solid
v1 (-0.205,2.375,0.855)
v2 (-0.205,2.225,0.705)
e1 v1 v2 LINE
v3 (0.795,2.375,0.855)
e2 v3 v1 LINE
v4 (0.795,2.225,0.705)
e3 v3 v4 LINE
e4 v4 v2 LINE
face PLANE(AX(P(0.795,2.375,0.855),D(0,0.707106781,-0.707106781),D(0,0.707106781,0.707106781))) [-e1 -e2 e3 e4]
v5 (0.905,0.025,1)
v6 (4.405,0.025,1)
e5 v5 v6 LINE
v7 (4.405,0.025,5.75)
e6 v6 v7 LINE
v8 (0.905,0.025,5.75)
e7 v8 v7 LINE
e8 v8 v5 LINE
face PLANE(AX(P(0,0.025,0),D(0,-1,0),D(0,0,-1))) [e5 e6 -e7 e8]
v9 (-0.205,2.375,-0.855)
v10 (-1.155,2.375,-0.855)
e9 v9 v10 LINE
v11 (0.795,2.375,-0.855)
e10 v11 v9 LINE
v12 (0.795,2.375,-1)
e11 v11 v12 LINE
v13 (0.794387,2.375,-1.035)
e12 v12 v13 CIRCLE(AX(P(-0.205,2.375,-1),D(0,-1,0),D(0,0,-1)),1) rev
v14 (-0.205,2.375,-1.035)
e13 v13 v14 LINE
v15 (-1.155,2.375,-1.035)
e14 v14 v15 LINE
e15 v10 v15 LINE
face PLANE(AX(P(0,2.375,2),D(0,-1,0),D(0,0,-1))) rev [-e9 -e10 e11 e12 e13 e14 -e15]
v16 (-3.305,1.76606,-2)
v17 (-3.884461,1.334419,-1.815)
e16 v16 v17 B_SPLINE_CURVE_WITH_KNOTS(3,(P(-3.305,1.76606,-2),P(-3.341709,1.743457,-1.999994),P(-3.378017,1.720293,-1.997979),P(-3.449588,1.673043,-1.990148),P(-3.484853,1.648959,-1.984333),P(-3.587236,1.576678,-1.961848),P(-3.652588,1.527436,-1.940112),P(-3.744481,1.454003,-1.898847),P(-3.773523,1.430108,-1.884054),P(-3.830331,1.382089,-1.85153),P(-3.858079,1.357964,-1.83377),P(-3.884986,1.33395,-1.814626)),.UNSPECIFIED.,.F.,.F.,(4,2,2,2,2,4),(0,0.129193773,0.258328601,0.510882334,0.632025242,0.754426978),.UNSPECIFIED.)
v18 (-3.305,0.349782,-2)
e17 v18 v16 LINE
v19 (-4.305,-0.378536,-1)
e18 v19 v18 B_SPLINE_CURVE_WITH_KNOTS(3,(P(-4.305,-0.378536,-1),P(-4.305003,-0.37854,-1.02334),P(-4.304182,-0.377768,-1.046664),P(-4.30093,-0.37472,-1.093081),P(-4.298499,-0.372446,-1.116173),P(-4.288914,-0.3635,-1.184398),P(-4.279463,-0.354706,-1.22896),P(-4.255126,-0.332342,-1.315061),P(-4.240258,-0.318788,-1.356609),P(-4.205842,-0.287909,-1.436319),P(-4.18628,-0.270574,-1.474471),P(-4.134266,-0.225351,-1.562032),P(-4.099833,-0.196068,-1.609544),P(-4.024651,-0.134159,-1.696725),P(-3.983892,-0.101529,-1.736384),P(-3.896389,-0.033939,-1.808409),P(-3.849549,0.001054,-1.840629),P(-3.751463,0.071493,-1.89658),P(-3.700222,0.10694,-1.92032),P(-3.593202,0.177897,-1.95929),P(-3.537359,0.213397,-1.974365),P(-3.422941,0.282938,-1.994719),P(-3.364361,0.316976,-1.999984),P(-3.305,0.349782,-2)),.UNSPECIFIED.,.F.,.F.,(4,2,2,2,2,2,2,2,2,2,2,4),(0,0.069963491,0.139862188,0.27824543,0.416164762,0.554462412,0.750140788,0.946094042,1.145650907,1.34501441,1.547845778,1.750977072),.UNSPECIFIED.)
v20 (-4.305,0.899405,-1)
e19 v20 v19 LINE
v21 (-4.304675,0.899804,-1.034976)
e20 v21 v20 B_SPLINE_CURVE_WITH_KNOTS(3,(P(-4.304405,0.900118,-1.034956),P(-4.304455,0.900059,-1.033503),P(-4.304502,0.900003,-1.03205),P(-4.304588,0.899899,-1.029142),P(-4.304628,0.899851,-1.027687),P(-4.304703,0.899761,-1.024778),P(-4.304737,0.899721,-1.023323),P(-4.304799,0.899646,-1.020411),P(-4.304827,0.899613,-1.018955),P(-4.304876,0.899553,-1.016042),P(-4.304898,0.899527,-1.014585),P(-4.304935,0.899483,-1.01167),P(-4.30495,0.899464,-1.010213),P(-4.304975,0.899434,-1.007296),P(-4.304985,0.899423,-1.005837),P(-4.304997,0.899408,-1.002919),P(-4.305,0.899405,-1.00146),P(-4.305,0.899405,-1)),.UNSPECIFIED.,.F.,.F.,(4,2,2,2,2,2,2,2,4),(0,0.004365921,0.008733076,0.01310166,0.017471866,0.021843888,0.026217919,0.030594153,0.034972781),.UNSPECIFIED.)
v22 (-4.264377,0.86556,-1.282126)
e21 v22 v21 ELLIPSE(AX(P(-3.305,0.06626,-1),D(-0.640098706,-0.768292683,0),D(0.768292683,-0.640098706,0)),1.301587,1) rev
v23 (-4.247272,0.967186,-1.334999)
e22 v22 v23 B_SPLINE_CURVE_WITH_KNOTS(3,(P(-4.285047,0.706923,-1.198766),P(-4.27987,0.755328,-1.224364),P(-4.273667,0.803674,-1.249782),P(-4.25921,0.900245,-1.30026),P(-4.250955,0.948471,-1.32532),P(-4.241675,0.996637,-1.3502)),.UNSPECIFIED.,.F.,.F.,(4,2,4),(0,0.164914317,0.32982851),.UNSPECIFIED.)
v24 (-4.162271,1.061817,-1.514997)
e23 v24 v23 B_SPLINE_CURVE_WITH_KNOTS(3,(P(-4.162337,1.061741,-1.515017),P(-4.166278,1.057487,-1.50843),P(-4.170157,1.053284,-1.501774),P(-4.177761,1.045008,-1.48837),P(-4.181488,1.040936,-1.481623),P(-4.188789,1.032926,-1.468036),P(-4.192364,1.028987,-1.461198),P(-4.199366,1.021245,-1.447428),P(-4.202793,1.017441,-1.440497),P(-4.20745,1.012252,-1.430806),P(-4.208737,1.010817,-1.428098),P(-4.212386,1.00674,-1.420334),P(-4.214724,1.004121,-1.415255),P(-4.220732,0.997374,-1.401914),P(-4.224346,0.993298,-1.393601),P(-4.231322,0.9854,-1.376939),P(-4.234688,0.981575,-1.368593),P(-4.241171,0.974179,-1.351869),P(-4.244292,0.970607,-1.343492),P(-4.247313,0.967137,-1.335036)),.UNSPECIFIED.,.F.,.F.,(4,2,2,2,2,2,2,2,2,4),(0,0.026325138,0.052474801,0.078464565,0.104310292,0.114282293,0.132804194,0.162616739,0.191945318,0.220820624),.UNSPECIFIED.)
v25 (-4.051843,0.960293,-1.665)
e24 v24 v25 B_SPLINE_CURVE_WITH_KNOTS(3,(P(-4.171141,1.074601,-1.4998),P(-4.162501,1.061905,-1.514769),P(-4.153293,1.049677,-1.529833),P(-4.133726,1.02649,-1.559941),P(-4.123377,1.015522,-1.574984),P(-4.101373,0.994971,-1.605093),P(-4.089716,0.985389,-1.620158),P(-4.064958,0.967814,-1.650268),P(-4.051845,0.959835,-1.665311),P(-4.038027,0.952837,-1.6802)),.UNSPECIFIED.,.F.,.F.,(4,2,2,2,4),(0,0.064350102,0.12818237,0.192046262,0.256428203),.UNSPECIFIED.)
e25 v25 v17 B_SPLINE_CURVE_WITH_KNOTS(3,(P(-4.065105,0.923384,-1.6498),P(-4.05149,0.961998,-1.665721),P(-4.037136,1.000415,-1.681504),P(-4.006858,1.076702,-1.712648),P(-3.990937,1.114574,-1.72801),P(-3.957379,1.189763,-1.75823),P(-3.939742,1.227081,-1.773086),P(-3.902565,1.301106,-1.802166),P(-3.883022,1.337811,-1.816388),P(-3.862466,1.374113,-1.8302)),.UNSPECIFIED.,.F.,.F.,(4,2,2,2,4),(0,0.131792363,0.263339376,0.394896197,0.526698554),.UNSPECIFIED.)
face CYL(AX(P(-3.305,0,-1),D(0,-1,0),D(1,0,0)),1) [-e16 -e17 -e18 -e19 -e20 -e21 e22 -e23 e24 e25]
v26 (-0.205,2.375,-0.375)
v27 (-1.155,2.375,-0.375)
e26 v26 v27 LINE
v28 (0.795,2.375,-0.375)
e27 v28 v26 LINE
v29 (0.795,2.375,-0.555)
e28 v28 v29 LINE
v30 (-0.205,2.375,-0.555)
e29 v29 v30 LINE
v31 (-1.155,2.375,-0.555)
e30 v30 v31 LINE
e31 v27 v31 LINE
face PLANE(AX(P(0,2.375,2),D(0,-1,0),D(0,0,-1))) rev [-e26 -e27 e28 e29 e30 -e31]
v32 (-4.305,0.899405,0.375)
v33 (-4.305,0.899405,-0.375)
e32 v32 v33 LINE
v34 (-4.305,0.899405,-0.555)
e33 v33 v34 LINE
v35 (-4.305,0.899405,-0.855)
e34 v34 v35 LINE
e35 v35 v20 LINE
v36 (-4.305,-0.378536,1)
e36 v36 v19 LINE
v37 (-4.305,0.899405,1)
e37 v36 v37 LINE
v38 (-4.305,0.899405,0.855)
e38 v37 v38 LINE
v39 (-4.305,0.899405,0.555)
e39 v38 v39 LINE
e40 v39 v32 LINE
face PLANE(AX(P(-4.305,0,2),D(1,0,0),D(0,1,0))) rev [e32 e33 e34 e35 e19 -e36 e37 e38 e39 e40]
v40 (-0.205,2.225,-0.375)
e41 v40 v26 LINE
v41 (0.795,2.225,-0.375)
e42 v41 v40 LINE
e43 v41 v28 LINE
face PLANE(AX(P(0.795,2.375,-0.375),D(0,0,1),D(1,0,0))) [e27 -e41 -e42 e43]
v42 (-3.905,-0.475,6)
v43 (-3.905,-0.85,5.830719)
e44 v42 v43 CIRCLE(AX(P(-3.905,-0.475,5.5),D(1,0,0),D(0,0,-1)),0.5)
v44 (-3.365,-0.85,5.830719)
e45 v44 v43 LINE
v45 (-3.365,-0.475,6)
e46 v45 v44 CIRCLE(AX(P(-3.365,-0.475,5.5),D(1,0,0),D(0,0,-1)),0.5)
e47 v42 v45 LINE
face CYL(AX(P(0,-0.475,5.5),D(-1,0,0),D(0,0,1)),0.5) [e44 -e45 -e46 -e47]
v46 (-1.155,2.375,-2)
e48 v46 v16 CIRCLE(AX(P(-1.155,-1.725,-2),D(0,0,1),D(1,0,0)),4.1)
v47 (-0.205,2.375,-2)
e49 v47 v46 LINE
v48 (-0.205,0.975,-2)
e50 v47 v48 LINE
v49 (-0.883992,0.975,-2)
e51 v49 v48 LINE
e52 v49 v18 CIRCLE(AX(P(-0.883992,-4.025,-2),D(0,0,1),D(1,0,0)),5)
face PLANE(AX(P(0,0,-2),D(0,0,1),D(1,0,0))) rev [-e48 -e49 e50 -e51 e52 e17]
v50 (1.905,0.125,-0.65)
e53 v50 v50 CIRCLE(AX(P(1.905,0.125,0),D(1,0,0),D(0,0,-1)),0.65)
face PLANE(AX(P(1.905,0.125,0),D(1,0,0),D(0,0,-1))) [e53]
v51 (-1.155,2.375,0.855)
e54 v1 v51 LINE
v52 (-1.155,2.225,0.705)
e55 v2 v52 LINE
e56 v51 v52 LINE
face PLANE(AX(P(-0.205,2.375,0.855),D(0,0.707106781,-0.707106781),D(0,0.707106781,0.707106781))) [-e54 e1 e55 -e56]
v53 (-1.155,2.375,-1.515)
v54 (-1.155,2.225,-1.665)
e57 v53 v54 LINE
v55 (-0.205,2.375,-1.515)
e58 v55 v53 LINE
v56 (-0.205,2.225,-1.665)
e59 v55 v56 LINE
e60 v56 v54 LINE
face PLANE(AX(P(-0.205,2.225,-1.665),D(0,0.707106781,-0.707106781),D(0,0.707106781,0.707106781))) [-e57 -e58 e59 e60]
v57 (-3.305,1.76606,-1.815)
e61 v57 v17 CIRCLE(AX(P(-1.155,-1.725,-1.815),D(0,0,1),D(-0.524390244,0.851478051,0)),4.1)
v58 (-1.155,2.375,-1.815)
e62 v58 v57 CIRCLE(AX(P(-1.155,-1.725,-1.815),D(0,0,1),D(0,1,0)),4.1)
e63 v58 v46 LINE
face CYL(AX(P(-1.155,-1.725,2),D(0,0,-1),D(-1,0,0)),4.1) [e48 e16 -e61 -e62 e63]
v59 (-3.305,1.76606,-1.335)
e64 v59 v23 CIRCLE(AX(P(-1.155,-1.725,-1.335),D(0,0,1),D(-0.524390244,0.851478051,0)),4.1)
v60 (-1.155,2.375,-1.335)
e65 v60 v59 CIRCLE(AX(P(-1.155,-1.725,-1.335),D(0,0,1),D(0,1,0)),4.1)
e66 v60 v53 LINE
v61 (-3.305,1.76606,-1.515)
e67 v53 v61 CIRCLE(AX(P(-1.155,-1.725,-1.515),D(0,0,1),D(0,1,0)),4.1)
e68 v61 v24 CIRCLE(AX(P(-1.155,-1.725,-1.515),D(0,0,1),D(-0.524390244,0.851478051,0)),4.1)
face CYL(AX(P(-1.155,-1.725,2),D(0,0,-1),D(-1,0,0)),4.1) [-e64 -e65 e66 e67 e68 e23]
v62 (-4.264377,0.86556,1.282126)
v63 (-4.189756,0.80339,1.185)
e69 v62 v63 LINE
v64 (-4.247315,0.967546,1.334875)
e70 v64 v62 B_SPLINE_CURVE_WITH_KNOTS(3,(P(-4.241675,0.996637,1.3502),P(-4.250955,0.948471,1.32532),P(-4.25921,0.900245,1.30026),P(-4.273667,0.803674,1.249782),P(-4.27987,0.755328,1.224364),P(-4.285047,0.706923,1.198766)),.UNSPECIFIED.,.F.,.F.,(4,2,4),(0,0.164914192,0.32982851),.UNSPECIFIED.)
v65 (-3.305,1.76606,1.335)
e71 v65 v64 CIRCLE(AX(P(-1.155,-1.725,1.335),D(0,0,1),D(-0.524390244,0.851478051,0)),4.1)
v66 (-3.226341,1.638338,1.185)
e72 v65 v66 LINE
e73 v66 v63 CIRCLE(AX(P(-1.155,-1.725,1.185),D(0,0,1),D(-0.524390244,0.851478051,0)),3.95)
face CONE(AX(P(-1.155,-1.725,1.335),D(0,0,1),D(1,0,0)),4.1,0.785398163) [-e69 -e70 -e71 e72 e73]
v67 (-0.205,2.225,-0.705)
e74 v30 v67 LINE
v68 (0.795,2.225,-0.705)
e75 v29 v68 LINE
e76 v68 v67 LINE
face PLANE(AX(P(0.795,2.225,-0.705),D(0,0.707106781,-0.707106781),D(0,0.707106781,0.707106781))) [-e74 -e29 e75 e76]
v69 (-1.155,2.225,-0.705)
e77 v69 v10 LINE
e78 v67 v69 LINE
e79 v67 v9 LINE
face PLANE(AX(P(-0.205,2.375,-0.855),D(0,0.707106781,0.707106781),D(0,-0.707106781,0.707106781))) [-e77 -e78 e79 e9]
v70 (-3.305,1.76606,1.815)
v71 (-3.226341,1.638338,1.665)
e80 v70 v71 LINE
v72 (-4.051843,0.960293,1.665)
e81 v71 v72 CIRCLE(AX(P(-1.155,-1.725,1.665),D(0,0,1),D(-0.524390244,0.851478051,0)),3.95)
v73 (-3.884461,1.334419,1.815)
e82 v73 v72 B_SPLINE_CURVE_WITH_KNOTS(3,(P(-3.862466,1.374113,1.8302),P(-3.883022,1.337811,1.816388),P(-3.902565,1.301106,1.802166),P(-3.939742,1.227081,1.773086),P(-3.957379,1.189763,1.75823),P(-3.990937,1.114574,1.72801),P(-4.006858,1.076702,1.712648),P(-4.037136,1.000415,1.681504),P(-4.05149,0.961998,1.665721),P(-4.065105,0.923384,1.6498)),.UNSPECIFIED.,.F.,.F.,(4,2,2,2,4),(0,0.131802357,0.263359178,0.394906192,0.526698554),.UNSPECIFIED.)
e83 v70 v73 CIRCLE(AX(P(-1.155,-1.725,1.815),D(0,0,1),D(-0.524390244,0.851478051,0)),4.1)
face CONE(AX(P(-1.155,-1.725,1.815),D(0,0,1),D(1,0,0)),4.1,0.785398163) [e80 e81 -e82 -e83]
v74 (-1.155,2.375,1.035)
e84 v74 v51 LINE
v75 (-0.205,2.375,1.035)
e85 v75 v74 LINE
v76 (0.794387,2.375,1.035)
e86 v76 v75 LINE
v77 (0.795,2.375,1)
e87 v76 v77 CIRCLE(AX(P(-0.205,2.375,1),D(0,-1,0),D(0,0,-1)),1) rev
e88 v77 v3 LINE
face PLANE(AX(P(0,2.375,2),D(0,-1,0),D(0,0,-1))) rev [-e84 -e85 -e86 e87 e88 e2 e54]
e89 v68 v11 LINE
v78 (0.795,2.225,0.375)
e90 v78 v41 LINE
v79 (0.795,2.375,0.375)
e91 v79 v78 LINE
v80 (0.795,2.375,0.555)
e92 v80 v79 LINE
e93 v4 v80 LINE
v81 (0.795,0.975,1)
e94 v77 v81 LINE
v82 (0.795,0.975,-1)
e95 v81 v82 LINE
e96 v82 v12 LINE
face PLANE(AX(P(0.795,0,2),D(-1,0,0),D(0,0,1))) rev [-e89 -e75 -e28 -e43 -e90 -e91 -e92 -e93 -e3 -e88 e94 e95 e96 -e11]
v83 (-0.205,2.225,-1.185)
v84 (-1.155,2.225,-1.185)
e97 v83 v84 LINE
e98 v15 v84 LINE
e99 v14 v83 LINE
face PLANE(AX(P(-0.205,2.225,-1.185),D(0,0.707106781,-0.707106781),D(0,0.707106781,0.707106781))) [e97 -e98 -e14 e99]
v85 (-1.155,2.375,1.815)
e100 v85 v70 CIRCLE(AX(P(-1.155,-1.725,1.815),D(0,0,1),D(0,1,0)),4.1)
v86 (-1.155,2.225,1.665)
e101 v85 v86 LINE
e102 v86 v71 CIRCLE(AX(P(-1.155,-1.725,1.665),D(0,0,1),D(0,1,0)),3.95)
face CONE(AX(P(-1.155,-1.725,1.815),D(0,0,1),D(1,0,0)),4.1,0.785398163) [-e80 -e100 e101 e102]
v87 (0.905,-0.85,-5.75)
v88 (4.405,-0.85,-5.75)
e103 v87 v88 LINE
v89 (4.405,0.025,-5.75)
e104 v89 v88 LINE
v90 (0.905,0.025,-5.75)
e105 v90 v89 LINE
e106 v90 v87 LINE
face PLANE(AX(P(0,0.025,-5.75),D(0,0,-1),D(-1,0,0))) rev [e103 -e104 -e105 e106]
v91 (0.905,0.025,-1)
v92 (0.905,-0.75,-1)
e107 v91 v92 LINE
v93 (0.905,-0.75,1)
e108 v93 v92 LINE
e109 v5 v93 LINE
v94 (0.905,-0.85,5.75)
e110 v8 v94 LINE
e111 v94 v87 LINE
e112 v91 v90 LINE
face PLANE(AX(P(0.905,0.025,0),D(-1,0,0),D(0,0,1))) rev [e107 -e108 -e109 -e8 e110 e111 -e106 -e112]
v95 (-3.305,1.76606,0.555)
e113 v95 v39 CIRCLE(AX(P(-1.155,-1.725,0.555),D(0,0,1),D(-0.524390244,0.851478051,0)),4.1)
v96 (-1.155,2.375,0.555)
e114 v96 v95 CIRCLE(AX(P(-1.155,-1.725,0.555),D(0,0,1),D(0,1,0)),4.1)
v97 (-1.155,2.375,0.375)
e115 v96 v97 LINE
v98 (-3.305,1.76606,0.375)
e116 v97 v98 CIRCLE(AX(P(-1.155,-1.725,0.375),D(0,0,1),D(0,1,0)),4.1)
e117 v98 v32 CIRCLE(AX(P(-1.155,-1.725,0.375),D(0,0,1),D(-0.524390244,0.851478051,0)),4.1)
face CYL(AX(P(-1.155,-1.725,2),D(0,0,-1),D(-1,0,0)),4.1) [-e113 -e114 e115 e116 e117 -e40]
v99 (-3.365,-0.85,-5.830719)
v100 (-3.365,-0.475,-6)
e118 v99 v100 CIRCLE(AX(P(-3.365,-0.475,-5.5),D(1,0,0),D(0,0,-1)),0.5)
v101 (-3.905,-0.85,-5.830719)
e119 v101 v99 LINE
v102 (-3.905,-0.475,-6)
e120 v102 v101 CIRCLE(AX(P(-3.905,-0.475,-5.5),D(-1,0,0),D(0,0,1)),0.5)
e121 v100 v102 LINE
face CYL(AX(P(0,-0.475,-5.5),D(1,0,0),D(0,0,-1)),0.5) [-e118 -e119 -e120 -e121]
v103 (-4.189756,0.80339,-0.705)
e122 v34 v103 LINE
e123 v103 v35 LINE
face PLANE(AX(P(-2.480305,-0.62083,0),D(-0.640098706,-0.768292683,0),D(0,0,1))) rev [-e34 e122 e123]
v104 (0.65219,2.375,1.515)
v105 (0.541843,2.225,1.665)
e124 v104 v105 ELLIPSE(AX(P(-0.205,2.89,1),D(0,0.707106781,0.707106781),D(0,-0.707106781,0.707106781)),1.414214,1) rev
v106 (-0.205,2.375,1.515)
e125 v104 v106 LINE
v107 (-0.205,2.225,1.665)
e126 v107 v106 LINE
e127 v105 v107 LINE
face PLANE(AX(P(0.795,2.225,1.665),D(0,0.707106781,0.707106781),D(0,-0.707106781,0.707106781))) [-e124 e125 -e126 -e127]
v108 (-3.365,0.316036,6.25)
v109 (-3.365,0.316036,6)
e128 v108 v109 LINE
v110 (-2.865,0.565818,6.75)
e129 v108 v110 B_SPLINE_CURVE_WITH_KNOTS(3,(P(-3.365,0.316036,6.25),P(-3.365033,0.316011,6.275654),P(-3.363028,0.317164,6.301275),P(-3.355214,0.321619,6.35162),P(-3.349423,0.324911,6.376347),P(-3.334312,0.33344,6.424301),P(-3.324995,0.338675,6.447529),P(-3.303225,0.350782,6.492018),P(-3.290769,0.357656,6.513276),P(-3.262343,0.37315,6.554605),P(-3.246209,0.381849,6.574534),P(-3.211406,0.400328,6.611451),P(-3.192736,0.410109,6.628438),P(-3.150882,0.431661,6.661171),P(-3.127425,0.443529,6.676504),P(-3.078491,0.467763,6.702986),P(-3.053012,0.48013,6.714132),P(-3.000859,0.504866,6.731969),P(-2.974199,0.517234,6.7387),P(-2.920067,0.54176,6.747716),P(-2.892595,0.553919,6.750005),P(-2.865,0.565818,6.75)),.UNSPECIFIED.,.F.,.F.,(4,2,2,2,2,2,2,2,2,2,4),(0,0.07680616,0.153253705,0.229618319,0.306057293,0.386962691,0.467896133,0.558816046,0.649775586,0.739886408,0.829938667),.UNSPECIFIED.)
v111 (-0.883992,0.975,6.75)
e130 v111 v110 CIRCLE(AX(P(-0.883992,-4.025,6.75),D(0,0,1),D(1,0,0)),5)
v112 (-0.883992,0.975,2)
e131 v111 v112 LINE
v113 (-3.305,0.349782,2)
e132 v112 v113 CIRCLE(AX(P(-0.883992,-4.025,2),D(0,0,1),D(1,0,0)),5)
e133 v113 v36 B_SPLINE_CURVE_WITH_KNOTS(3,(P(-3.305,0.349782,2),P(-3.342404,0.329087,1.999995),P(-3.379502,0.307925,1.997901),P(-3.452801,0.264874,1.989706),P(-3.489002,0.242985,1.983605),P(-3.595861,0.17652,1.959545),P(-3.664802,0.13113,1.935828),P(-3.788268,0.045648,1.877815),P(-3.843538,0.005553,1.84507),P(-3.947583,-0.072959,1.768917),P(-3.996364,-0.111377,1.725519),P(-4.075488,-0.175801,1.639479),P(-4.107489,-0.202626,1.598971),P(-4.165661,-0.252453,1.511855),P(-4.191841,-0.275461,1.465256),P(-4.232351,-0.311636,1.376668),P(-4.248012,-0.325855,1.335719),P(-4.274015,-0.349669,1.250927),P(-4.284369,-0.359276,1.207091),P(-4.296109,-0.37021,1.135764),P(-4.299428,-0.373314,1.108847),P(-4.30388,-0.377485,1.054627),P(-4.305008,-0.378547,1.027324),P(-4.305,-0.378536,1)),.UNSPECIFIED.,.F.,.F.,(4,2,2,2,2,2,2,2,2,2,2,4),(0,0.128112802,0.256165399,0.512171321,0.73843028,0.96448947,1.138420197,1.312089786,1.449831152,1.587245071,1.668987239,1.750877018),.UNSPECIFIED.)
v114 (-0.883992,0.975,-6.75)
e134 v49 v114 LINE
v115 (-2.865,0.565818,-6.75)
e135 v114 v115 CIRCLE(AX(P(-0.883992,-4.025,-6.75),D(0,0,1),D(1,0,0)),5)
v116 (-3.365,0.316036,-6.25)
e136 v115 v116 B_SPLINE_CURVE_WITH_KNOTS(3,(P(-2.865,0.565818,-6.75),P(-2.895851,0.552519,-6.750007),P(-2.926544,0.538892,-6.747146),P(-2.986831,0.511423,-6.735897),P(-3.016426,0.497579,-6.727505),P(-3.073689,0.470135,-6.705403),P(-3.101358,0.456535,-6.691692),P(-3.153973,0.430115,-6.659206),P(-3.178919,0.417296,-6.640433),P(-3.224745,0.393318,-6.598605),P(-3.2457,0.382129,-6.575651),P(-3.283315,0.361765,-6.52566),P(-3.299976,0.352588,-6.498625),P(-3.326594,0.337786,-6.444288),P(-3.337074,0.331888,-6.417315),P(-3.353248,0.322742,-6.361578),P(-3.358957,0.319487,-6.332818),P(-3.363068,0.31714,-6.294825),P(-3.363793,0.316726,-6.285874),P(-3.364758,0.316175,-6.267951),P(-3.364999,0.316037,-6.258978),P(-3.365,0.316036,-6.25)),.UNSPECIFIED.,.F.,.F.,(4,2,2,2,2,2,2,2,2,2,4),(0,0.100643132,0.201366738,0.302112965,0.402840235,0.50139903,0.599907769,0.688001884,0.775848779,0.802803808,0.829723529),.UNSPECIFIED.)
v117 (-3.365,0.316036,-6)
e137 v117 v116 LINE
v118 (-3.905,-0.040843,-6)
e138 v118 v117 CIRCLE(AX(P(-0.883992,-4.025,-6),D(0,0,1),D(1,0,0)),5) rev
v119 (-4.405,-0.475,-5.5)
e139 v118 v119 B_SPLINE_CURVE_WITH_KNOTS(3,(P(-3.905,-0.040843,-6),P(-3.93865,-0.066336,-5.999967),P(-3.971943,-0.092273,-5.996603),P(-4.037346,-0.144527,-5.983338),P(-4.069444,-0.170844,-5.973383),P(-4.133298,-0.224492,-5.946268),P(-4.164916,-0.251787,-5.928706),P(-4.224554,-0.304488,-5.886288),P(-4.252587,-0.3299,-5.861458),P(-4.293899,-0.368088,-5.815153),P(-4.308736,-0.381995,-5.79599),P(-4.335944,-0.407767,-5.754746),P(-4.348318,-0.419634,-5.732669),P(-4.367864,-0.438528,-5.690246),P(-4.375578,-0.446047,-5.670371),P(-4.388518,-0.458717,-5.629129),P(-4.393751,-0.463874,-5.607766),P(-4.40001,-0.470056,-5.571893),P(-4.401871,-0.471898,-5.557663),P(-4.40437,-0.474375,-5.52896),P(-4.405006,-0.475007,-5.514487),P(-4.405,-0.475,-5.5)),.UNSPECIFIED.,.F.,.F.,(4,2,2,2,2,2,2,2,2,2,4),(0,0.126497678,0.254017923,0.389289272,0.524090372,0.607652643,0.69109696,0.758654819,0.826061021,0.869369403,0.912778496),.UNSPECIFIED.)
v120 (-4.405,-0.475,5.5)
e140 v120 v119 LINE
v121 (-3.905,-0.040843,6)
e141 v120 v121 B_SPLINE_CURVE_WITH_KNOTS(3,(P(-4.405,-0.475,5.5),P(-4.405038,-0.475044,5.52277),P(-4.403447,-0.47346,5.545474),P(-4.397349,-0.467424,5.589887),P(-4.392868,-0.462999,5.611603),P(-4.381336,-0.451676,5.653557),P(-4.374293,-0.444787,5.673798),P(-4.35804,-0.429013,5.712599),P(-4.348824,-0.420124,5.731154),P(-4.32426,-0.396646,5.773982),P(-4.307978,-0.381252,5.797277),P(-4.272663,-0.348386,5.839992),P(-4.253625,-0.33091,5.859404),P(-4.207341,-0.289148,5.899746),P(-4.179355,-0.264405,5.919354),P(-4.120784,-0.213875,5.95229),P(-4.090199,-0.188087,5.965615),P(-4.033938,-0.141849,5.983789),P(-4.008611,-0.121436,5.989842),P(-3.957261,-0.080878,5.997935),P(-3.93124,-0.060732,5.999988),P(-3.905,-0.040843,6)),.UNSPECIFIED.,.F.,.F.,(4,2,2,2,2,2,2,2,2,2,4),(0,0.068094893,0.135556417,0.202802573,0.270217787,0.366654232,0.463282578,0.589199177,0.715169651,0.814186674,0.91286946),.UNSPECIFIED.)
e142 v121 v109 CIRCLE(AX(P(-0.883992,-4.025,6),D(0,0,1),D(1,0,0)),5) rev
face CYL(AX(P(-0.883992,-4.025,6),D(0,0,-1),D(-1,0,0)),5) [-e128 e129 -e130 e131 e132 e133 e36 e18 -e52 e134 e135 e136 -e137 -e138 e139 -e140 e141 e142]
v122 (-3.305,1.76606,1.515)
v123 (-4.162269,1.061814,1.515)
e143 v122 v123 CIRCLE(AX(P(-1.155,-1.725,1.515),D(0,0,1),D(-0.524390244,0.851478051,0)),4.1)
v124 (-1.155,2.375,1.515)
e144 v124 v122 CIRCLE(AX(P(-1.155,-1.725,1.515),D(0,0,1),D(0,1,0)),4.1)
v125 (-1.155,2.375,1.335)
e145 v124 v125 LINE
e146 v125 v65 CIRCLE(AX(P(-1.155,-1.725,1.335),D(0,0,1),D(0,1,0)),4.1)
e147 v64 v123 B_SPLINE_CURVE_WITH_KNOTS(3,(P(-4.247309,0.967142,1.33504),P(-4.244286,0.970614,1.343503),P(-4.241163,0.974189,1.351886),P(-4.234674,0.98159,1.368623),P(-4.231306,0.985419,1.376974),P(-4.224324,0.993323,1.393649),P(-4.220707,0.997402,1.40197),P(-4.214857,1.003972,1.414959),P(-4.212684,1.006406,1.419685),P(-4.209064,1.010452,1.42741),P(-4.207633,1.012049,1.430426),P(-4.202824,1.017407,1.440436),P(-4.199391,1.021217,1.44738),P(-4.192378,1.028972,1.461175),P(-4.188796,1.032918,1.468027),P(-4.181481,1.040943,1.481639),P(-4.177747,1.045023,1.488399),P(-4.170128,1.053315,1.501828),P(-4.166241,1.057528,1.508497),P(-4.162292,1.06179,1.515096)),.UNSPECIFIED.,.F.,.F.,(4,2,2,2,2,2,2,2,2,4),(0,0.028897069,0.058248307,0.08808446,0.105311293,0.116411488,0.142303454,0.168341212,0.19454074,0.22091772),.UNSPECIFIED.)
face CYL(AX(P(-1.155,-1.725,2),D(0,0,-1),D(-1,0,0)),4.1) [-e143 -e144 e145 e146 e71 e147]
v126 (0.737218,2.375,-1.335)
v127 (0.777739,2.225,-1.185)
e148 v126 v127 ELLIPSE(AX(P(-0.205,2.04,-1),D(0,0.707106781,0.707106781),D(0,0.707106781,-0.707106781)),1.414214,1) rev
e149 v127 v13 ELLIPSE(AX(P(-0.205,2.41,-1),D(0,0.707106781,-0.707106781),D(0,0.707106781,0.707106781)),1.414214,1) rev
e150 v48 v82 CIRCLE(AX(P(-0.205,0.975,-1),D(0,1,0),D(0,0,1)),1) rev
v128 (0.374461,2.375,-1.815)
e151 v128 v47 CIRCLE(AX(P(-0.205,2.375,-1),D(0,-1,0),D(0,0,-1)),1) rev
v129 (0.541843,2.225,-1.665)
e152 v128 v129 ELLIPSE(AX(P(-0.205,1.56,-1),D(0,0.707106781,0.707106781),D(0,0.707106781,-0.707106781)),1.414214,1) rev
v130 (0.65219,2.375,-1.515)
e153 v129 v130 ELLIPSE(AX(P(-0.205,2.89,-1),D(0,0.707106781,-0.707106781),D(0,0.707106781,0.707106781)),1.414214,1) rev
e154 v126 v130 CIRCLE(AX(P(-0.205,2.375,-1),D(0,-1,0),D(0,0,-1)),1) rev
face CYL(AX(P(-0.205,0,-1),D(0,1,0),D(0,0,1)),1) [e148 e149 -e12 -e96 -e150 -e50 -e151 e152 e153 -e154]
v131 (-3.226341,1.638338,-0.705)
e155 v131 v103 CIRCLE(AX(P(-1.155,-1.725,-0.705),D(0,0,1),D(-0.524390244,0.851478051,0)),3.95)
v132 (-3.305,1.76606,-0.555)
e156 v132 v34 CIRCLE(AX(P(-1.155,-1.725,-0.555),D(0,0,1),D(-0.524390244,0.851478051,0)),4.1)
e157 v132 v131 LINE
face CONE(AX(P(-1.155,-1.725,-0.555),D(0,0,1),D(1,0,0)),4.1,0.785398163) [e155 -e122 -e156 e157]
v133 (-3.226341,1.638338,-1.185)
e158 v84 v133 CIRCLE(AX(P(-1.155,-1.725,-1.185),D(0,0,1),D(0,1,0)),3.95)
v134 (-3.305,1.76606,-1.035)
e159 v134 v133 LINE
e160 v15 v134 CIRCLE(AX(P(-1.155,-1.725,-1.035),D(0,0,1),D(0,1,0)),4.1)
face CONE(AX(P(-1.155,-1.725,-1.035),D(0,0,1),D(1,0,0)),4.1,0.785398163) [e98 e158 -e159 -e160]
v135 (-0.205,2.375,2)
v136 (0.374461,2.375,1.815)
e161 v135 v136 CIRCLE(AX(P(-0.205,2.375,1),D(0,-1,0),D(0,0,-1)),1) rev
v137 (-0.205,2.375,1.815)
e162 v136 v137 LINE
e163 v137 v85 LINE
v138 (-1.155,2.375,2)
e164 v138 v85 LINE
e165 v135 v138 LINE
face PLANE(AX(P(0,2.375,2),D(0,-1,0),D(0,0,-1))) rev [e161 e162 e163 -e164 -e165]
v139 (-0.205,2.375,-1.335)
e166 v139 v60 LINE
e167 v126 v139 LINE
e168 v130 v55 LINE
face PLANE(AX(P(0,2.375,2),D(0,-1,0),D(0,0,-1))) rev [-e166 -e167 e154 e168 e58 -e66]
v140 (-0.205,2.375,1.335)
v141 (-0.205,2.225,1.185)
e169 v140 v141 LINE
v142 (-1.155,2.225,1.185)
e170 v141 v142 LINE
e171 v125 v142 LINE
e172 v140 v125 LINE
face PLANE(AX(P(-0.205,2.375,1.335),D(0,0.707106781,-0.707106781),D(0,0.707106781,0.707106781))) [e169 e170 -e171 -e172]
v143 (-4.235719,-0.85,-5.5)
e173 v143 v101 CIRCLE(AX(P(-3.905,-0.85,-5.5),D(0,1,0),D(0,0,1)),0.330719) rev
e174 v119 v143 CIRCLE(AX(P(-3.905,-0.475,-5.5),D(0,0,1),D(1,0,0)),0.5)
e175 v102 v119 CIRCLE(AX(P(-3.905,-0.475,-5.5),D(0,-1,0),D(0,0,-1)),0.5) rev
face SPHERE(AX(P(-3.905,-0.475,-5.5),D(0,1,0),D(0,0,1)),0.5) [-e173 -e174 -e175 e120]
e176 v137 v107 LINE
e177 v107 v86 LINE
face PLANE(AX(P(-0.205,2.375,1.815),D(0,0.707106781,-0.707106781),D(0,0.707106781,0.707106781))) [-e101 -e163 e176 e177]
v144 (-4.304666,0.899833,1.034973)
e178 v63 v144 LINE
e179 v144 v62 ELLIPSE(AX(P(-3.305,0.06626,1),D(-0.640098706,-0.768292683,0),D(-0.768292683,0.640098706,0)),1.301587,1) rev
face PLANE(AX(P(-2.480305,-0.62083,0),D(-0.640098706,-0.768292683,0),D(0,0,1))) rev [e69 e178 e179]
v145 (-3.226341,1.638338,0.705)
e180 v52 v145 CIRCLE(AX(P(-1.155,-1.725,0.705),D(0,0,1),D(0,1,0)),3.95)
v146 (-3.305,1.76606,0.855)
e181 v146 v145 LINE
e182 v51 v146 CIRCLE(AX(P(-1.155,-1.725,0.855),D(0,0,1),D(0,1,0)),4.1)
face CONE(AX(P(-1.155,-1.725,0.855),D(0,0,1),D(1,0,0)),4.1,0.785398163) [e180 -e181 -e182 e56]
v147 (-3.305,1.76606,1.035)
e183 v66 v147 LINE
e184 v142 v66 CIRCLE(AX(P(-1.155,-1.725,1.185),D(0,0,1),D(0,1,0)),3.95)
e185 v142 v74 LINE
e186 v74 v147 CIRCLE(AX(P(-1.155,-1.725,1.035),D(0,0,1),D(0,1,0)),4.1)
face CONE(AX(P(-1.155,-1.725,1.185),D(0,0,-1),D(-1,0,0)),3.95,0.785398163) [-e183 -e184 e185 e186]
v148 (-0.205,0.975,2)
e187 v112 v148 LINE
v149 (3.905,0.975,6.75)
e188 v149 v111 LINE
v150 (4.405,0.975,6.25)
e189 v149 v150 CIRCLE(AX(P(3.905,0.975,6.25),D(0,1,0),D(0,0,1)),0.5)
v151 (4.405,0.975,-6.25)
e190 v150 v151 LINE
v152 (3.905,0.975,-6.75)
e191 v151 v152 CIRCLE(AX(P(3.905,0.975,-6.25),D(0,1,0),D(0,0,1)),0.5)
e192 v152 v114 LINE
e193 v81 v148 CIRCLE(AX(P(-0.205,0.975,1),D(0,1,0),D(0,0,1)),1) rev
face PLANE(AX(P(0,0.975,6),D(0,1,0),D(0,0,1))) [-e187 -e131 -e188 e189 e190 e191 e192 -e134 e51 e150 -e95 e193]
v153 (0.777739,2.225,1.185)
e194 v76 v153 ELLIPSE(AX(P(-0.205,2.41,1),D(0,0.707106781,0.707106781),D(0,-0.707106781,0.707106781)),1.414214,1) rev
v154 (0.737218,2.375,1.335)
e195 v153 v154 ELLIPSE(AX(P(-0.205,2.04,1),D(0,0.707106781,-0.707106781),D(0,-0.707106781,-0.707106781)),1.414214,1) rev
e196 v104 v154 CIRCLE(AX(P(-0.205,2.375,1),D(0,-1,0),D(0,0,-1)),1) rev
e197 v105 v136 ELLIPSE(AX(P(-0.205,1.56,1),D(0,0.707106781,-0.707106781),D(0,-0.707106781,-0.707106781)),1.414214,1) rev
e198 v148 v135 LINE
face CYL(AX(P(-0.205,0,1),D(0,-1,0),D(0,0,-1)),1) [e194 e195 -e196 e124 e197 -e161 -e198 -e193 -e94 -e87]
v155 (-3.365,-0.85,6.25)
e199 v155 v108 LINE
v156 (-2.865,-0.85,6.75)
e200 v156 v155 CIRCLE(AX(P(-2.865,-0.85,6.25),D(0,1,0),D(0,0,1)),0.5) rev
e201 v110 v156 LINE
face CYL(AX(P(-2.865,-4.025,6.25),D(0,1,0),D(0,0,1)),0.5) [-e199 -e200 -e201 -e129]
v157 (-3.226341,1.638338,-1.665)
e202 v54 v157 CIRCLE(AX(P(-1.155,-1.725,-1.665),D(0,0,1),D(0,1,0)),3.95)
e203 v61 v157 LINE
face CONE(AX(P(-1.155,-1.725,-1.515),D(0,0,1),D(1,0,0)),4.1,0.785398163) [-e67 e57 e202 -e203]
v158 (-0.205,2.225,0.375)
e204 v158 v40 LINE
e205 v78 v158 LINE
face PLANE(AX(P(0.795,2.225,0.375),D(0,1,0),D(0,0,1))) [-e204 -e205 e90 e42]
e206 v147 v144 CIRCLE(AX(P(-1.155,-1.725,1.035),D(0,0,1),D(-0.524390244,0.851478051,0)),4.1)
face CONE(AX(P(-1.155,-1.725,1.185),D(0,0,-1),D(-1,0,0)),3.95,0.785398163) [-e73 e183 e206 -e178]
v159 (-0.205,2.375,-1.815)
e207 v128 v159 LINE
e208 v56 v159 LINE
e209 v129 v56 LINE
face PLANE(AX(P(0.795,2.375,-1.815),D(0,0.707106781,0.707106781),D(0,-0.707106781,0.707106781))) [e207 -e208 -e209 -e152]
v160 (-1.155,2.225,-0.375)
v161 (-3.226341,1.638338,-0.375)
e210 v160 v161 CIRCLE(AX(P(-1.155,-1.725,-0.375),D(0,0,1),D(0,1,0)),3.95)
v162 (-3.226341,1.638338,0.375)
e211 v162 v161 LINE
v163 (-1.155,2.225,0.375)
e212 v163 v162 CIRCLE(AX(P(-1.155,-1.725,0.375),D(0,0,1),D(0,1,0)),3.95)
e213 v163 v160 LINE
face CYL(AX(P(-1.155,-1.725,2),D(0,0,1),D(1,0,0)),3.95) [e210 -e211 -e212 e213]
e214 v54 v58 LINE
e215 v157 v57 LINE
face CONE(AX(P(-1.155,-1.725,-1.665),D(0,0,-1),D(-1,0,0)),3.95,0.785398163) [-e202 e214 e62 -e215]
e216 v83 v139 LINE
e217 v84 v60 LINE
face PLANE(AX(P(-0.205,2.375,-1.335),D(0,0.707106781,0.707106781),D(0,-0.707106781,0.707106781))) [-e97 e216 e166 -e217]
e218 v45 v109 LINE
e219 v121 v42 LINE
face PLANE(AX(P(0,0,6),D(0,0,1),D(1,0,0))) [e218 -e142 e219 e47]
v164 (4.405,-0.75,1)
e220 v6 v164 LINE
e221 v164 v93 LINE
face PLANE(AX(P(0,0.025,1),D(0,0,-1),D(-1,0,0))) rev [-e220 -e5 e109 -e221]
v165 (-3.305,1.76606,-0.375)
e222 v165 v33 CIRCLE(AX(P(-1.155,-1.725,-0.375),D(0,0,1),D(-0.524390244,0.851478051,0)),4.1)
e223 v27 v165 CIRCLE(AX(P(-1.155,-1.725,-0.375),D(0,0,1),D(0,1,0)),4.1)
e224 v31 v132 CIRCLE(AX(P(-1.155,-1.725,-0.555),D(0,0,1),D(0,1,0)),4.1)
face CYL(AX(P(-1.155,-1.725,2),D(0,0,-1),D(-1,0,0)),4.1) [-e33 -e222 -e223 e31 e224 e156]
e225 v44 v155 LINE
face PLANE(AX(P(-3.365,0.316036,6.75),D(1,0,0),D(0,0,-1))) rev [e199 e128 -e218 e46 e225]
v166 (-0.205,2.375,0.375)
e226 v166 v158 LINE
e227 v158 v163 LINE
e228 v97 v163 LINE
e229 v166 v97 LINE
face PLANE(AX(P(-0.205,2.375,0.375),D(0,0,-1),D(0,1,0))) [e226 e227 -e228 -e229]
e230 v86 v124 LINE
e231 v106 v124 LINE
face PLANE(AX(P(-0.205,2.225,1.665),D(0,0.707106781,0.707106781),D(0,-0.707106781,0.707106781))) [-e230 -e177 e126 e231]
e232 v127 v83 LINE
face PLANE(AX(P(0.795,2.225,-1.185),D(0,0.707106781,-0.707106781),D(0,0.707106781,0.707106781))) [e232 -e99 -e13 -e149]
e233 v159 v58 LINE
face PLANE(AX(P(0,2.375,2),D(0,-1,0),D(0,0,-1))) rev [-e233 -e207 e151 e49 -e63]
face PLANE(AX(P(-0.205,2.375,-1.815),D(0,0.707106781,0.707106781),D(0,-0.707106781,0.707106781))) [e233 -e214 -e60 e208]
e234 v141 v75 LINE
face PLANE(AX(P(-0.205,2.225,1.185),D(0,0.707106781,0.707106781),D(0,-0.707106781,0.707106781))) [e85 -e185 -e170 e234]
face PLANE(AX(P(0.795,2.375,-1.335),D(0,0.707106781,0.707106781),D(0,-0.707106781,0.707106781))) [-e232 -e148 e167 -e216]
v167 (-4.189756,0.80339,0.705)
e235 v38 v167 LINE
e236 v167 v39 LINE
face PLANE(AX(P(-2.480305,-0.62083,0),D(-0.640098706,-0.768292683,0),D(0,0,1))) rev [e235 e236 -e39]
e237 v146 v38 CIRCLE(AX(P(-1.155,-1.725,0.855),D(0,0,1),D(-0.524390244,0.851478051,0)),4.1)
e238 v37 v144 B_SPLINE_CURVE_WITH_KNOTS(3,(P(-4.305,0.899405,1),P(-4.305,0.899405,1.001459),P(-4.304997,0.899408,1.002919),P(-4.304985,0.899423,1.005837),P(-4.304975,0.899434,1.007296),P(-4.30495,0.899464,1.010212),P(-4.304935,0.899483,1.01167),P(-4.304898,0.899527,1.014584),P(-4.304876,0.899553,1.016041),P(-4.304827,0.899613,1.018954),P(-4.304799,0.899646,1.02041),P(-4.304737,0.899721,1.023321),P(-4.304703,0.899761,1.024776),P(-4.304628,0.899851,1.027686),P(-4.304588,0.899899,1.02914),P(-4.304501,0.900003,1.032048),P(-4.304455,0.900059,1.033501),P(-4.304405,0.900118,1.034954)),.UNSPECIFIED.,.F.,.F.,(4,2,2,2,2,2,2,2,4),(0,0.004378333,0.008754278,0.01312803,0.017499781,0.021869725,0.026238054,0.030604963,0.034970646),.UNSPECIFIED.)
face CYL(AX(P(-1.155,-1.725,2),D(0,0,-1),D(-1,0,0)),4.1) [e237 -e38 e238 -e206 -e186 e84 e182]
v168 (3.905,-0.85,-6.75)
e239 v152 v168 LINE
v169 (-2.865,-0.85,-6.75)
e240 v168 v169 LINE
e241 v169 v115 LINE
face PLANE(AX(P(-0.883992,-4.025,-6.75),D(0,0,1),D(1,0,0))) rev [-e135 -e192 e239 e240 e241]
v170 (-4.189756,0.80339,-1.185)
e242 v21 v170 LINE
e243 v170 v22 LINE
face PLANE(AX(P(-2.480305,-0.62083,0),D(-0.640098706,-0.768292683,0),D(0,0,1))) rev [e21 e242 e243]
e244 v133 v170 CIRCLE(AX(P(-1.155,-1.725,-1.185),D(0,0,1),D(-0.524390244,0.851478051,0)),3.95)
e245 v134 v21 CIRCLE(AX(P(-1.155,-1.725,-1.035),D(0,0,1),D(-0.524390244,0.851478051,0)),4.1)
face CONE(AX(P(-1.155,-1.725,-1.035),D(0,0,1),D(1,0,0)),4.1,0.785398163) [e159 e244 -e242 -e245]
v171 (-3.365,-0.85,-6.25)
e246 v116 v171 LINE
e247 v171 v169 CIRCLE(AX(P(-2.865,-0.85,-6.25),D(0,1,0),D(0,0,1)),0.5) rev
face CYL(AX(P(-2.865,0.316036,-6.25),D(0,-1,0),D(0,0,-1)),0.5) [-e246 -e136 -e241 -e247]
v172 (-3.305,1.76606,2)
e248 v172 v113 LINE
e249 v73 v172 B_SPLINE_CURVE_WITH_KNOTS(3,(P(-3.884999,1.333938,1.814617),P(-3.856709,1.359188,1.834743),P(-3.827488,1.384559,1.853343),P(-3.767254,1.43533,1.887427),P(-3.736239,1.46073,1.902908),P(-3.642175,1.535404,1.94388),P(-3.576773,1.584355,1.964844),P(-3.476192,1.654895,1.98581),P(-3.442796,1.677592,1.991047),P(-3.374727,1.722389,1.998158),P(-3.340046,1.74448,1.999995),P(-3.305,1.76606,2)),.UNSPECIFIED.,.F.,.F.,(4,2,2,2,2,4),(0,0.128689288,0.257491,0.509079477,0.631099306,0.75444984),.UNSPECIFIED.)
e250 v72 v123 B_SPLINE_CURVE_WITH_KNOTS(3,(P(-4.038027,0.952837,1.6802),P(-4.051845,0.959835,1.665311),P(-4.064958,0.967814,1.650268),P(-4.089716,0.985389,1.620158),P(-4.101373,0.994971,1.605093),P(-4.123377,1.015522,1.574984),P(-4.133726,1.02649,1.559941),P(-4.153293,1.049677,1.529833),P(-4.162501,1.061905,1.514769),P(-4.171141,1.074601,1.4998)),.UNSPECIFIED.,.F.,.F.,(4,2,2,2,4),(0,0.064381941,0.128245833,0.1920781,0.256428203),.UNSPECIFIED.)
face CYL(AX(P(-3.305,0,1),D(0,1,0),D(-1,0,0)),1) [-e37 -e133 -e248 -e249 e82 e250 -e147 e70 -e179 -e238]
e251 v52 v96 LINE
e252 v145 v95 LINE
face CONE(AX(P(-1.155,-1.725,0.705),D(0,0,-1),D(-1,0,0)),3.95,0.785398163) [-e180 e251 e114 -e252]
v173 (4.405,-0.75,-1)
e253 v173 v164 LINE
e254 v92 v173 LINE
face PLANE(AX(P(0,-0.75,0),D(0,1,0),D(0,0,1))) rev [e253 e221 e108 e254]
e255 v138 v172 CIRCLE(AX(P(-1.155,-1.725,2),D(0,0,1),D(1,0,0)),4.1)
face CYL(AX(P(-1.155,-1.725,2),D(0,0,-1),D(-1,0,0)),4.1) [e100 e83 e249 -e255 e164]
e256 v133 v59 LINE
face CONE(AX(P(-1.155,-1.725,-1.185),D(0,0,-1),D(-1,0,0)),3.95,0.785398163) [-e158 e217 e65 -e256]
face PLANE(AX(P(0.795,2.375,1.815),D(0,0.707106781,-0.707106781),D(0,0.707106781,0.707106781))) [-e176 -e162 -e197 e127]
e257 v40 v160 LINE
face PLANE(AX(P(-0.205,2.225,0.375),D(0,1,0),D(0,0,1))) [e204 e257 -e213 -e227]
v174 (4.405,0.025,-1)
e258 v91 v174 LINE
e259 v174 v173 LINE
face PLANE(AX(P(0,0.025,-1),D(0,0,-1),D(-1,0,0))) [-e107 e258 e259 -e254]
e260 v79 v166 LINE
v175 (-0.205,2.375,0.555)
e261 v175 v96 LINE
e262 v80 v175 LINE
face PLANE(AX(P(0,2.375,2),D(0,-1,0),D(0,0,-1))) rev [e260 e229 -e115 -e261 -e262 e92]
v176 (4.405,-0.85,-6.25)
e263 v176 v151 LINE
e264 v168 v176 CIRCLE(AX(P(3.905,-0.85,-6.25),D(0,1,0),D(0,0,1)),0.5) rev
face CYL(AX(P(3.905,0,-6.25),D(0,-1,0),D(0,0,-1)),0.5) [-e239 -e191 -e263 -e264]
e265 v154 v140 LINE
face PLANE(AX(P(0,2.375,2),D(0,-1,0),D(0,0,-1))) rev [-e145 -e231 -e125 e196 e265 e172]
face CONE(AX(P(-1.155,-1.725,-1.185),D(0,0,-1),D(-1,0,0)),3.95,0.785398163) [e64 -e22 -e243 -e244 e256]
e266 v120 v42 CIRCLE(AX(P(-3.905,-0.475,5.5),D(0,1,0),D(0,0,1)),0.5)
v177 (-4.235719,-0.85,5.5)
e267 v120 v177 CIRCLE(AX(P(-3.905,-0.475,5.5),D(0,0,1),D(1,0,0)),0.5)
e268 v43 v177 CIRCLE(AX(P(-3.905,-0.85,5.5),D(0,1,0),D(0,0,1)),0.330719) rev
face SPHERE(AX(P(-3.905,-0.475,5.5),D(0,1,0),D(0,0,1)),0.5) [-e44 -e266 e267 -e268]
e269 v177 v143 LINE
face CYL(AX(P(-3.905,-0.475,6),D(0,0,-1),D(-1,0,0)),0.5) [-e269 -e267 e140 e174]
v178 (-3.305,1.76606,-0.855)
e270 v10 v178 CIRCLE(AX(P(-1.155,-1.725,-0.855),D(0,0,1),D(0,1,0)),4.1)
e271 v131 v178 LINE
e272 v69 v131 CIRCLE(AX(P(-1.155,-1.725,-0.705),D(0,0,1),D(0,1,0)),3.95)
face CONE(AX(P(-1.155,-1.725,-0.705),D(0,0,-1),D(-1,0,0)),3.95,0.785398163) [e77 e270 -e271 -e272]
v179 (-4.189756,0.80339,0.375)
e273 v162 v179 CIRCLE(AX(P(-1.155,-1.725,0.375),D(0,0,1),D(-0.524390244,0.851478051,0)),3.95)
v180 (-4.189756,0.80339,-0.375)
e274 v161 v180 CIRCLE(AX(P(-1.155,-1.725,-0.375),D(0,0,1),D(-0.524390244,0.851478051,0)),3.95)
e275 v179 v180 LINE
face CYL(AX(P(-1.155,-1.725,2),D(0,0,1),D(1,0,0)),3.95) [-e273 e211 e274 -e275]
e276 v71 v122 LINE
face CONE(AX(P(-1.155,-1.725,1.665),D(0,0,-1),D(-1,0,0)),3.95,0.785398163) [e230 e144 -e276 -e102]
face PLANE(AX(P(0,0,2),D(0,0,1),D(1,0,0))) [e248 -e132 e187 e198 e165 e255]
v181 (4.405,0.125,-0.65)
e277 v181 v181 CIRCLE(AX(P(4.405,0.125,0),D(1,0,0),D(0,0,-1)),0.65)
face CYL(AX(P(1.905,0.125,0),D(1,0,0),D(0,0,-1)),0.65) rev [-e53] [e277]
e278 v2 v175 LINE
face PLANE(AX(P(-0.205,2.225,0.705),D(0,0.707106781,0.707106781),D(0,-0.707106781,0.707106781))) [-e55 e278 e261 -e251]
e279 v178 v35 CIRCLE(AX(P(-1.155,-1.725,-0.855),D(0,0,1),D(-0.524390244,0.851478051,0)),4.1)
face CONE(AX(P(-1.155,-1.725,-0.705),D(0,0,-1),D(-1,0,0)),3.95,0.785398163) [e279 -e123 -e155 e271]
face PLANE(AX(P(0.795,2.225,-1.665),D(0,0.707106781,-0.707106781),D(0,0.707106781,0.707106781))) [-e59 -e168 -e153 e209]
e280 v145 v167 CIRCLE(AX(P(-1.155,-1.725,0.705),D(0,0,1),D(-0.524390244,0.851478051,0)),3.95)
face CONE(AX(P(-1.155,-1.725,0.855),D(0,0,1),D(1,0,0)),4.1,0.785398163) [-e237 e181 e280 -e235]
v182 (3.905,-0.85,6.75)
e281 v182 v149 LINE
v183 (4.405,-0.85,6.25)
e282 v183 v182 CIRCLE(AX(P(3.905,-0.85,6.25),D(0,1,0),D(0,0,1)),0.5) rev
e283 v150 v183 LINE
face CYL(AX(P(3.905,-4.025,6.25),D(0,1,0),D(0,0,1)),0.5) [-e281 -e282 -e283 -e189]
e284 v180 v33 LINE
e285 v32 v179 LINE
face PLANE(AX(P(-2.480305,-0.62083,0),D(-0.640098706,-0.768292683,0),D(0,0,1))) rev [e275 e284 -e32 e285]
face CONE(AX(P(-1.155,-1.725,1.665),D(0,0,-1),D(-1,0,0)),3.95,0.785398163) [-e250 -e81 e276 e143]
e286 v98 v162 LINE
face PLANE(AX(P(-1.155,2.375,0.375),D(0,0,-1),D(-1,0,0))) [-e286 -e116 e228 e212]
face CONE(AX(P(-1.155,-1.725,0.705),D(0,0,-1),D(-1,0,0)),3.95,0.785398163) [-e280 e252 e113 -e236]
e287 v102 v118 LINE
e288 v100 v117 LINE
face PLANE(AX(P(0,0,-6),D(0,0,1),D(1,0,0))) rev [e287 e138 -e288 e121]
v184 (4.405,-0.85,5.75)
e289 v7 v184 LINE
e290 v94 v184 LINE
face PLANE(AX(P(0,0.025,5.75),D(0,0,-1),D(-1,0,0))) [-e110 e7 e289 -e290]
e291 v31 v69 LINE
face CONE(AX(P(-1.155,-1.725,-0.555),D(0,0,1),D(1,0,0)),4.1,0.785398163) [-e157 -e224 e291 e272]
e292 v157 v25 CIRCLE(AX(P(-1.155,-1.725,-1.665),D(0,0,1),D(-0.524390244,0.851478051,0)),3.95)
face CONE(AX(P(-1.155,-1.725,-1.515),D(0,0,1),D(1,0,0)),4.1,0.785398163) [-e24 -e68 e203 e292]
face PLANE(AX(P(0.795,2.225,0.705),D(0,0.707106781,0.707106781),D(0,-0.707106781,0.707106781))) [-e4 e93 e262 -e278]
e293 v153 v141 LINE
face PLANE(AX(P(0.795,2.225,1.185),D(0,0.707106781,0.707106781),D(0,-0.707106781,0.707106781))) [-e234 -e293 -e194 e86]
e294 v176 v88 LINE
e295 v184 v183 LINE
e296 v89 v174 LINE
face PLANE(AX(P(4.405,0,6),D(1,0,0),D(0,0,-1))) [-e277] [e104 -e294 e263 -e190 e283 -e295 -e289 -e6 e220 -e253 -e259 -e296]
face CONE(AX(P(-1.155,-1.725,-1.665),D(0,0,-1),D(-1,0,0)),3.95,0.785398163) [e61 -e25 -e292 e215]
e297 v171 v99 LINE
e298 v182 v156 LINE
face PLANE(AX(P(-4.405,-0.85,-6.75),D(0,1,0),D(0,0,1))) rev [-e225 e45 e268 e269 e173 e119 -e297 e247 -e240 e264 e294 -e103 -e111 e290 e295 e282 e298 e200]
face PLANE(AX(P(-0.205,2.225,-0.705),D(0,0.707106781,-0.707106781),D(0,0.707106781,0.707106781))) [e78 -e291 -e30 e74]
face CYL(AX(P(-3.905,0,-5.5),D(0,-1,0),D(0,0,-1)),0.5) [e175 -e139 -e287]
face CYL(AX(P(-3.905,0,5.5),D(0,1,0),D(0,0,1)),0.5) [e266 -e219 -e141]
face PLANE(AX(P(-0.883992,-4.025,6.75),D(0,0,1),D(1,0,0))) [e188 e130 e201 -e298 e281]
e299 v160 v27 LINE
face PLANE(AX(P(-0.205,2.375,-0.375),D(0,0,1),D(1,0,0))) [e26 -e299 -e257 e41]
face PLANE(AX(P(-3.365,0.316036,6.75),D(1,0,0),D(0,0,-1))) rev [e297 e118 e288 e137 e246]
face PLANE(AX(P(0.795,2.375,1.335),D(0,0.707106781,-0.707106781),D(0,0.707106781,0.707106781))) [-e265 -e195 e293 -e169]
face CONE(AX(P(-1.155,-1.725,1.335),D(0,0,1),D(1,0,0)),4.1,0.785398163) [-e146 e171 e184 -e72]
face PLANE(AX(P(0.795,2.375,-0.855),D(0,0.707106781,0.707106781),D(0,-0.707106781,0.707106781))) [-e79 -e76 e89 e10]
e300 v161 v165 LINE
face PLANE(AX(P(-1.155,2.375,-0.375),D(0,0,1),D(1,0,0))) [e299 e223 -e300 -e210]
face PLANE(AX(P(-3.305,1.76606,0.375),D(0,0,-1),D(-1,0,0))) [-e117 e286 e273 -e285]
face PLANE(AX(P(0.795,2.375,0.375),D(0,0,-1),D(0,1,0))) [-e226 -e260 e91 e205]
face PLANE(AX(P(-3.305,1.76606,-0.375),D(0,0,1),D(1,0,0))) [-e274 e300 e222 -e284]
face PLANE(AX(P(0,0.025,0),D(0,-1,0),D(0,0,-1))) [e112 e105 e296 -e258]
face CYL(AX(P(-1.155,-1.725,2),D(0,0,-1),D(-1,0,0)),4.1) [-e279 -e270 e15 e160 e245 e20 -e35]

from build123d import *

# Parameters (mm, degrees)
BOSS_EXTRUDE1_DEPTH = 6
BOSS_EXTRUDE2_DEPTH = 2
FILLET1_R           = 1
BOSS_EXTRUDE3_DEPTH = 6.75
FILLET2_R           = 0.5
SKETCH6_R           = 0.65
CUT_EXTRUDE1_DEPTH  = 2.5
FILLET3_R           = 0.5
SKETCH8_W           = 3.5
SKETCH8_H           = 4.75
CUT_EXTRUDE2_DEPTH  = 1
SKETCH9_W           = 8.81
SKETCH9_H           = 0.125
CUT_EXTRUDE3_DEPTH  = 15.397730865
SKETCH10_W          = 3.5
SKETCH10_H          = 2
CUT_EXTRUDE4_DEPTH  = 0.1


with BuildPart() as part:
    # Sketch2 → Boss-Extrude1 (new, symmetric)
    with BuildSketch(Plane.XY):
        with BuildLine():
            Line((4.405, 0.975), (-0.883991622, 0.975))
            ThreePointArc((-0.883991622, 0.975), (-2.787934898, 0.598310502), (-4.405, -0.475))
            Line((-4.405, -0.475), (-4.405, -0.975))
            Line((-4.405, -0.975), (4.405, -0.975))
            Line((4.405, -0.975), (4.405, 0.975))
        make_face()
    extrude(amount=BOSS_EXTRUDE1_DEPTH, both=True)

    # Sketch3 → Boss-Extrude2 (add, symmetric)
    with BuildSketch(Plane.XY):
        with BuildLine():
            ThreePointArc((-1.155, 2.375), (-2.894244197, 1.987819633), (-4.305, 0.899404694))
            Line((-4.305, 0.899404694), (-4.305, -0.37853573))
            ThreePointArc((-4.305, -0.37853573), (-2.723513115, 0.624318302), (-0.883991622, 0.975))
            Line((-0.883991622, 0.975), (0.795, 0.975))
            Line((0.795, 0.975), (0.795, 2.375))
            Line((0.795, 2.375), (-1.155, 2.375))
        make_face()
    extrude(amount=BOSS_EXTRUDE2_DEPTH, both=True)

    # Fillet1
    fillet1_edges = [part.edges().sort_by_distance(p)[0] for p in [
        (0.795, 1.675, -2),
        (-4.305, 0.260434482, -2),
        (0.795, 1.675, 2),
        (-4.305, 0.260434482, 2),
    ]]
    fillet(fillet1_edges, radius=FILLET1_R)

    # Cut-Sweep1: sweep along a path in Sketch4
    with BuildLine(Plane.XY.offset(2)) as cut_sweep1_path:
        Line((0.795, 2.375), (-0.205, 2.375))
        Line((-0.205, 2.375), (-1.155, 2.375))
        ThreePointArc((-1.155, 2.375), (-2.27228554, 2.219828643), (-3.305, 1.766060011))
        ThreePointArc((-3.305, 1.766060011), (-3.840195125, 1.373342644), (-4.305, 0.899404694))
    # Sketch5 → Cut-Sweep1 (sweep, cut)
    with BuildSketch(Plane(origin=(0.795, 0, 0), x_dir=(0, 0, -1), z_dir=(1, 0, 0))):
        Polygon((-1.815, 2.375), (-1.665, 2.225), (-1.515, 2.375), (-1.335, 2.375), (-1.185, 2.225), (-1.035, 2.375), (-0.855, 2.375), (-0.705, 2.225), (-0.555, 2.375), (-0.375, 2.375), (-0.375, 2.225), (0.375, 2.225), (0.375, 2.375), (0.555, 2.375), (0.705, 2.225), (0.855, 2.375), (1.035, 2.375), (1.185, 2.225), (1.335, 2.375), (1.515, 2.375), (1.665, 2.225), (1.815, 2.375), (1.815, 2.475), (-1.815, 2.475), align=None)
    sweep(path=cut_sweep1_path.line, mode=Mode.SUBTRACT)

    # Sketch7 → Boss-Extrude3 (add, symmetric)
    with BuildSketch(Plane.XY):
        with BuildLine():
            Line((4.405, -0.975), (4.405, 0.975))
            Line((4.405, 0.975), (-0.883991622, 0.975))
            ThreePointArc((-0.883991622, 0.975), (-2.167505893, 0.807451874), (-3.365, 0.316036446))
            Line((-3.365, 0.316036446), (-3.365, -0.975))
            Line((-3.365, -0.975), (4.405, -0.975))
        make_face()
    extrude(amount=BOSS_EXTRUDE3_DEPTH, both=True)

    # Fillet2
    fillet2_edges = [part.edges().sort_by_distance(p)[0] for p in [
        (-4.405, -0.725, 6),
        (4.405, 0, -6.75),
        (-3.365, -0.329481777, -6.75),
        (4.405, 0, 6.75),
        (-3.365, -0.329481777, 6.75),
        (-4.405, -0.725, -6),
    ]]
    fillet(fillet2_edges, radius=FILLET2_R)

    # Sketch6 → Cut-Extrude1 (cut)
    with BuildSketch(Plane(origin=(4.405, 0, 0), x_dir=(0, 0, -1), z_dir=(1, 0, 0))):
        with Locations((0, 0.125)):
            Circle(SKETCH6_R)
    extrude(amount=-CUT_EXTRUDE1_DEPTH, mode=Mode.SUBTRACT)

    # Fillet3
    fillet3_edges = [part.edges().sort_by_distance(p)[0] for p in [
        (-3.635, -0.975, 6),
        (-4.258553391, -0.975, 5.853553391),
        (-3.635, -0.975, -6),
        (-4.258553391, -0.975, -5.853553391),
        (-4.405, -0.975, 0),
    ]]
    fillet(fillet3_edges, radius=FILLET3_R - 0.0001)  # a hair under: the kernel refuses the full size

    # Sketch8 → Cut-Extrude2 (cut)
    with BuildSketch(Plane.XZ.offset(0.975)):
        with Locations((2.655, -3.375)):
            Rectangle(SKETCH8_W, SKETCH8_H)
        with Locations((2.655, 3.375)):
            Rectangle(SKETCH8_W, SKETCH8_H)
    extrude(amount=-CUT_EXTRUDE2_DEPTH, mode=Mode.SUBTRACT)

    # Sketch9 → Cut-Extrude3 (cut, through all)
    with BuildSketch(Plane.XY.offset(6.75)):
        with Locations((0, -0.9125)):
            Rectangle(SKETCH9_W, SKETCH9_H)
    extrude(amount=-CUT_EXTRUDE3_DEPTH, mode=Mode.SUBTRACT)

    # Sketch10 → Cut-Extrude4 (cut)
    with BuildSketch(Plane.XZ.offset(0.85)):
        with Locations((2.655, 0)):
            Rectangle(SKETCH10_W, SKETCH10_H)
    extrude(amount=-CUT_EXTRUDE4_DEPTH, mode=Mode.SUBTRACT)


solid = part.part
